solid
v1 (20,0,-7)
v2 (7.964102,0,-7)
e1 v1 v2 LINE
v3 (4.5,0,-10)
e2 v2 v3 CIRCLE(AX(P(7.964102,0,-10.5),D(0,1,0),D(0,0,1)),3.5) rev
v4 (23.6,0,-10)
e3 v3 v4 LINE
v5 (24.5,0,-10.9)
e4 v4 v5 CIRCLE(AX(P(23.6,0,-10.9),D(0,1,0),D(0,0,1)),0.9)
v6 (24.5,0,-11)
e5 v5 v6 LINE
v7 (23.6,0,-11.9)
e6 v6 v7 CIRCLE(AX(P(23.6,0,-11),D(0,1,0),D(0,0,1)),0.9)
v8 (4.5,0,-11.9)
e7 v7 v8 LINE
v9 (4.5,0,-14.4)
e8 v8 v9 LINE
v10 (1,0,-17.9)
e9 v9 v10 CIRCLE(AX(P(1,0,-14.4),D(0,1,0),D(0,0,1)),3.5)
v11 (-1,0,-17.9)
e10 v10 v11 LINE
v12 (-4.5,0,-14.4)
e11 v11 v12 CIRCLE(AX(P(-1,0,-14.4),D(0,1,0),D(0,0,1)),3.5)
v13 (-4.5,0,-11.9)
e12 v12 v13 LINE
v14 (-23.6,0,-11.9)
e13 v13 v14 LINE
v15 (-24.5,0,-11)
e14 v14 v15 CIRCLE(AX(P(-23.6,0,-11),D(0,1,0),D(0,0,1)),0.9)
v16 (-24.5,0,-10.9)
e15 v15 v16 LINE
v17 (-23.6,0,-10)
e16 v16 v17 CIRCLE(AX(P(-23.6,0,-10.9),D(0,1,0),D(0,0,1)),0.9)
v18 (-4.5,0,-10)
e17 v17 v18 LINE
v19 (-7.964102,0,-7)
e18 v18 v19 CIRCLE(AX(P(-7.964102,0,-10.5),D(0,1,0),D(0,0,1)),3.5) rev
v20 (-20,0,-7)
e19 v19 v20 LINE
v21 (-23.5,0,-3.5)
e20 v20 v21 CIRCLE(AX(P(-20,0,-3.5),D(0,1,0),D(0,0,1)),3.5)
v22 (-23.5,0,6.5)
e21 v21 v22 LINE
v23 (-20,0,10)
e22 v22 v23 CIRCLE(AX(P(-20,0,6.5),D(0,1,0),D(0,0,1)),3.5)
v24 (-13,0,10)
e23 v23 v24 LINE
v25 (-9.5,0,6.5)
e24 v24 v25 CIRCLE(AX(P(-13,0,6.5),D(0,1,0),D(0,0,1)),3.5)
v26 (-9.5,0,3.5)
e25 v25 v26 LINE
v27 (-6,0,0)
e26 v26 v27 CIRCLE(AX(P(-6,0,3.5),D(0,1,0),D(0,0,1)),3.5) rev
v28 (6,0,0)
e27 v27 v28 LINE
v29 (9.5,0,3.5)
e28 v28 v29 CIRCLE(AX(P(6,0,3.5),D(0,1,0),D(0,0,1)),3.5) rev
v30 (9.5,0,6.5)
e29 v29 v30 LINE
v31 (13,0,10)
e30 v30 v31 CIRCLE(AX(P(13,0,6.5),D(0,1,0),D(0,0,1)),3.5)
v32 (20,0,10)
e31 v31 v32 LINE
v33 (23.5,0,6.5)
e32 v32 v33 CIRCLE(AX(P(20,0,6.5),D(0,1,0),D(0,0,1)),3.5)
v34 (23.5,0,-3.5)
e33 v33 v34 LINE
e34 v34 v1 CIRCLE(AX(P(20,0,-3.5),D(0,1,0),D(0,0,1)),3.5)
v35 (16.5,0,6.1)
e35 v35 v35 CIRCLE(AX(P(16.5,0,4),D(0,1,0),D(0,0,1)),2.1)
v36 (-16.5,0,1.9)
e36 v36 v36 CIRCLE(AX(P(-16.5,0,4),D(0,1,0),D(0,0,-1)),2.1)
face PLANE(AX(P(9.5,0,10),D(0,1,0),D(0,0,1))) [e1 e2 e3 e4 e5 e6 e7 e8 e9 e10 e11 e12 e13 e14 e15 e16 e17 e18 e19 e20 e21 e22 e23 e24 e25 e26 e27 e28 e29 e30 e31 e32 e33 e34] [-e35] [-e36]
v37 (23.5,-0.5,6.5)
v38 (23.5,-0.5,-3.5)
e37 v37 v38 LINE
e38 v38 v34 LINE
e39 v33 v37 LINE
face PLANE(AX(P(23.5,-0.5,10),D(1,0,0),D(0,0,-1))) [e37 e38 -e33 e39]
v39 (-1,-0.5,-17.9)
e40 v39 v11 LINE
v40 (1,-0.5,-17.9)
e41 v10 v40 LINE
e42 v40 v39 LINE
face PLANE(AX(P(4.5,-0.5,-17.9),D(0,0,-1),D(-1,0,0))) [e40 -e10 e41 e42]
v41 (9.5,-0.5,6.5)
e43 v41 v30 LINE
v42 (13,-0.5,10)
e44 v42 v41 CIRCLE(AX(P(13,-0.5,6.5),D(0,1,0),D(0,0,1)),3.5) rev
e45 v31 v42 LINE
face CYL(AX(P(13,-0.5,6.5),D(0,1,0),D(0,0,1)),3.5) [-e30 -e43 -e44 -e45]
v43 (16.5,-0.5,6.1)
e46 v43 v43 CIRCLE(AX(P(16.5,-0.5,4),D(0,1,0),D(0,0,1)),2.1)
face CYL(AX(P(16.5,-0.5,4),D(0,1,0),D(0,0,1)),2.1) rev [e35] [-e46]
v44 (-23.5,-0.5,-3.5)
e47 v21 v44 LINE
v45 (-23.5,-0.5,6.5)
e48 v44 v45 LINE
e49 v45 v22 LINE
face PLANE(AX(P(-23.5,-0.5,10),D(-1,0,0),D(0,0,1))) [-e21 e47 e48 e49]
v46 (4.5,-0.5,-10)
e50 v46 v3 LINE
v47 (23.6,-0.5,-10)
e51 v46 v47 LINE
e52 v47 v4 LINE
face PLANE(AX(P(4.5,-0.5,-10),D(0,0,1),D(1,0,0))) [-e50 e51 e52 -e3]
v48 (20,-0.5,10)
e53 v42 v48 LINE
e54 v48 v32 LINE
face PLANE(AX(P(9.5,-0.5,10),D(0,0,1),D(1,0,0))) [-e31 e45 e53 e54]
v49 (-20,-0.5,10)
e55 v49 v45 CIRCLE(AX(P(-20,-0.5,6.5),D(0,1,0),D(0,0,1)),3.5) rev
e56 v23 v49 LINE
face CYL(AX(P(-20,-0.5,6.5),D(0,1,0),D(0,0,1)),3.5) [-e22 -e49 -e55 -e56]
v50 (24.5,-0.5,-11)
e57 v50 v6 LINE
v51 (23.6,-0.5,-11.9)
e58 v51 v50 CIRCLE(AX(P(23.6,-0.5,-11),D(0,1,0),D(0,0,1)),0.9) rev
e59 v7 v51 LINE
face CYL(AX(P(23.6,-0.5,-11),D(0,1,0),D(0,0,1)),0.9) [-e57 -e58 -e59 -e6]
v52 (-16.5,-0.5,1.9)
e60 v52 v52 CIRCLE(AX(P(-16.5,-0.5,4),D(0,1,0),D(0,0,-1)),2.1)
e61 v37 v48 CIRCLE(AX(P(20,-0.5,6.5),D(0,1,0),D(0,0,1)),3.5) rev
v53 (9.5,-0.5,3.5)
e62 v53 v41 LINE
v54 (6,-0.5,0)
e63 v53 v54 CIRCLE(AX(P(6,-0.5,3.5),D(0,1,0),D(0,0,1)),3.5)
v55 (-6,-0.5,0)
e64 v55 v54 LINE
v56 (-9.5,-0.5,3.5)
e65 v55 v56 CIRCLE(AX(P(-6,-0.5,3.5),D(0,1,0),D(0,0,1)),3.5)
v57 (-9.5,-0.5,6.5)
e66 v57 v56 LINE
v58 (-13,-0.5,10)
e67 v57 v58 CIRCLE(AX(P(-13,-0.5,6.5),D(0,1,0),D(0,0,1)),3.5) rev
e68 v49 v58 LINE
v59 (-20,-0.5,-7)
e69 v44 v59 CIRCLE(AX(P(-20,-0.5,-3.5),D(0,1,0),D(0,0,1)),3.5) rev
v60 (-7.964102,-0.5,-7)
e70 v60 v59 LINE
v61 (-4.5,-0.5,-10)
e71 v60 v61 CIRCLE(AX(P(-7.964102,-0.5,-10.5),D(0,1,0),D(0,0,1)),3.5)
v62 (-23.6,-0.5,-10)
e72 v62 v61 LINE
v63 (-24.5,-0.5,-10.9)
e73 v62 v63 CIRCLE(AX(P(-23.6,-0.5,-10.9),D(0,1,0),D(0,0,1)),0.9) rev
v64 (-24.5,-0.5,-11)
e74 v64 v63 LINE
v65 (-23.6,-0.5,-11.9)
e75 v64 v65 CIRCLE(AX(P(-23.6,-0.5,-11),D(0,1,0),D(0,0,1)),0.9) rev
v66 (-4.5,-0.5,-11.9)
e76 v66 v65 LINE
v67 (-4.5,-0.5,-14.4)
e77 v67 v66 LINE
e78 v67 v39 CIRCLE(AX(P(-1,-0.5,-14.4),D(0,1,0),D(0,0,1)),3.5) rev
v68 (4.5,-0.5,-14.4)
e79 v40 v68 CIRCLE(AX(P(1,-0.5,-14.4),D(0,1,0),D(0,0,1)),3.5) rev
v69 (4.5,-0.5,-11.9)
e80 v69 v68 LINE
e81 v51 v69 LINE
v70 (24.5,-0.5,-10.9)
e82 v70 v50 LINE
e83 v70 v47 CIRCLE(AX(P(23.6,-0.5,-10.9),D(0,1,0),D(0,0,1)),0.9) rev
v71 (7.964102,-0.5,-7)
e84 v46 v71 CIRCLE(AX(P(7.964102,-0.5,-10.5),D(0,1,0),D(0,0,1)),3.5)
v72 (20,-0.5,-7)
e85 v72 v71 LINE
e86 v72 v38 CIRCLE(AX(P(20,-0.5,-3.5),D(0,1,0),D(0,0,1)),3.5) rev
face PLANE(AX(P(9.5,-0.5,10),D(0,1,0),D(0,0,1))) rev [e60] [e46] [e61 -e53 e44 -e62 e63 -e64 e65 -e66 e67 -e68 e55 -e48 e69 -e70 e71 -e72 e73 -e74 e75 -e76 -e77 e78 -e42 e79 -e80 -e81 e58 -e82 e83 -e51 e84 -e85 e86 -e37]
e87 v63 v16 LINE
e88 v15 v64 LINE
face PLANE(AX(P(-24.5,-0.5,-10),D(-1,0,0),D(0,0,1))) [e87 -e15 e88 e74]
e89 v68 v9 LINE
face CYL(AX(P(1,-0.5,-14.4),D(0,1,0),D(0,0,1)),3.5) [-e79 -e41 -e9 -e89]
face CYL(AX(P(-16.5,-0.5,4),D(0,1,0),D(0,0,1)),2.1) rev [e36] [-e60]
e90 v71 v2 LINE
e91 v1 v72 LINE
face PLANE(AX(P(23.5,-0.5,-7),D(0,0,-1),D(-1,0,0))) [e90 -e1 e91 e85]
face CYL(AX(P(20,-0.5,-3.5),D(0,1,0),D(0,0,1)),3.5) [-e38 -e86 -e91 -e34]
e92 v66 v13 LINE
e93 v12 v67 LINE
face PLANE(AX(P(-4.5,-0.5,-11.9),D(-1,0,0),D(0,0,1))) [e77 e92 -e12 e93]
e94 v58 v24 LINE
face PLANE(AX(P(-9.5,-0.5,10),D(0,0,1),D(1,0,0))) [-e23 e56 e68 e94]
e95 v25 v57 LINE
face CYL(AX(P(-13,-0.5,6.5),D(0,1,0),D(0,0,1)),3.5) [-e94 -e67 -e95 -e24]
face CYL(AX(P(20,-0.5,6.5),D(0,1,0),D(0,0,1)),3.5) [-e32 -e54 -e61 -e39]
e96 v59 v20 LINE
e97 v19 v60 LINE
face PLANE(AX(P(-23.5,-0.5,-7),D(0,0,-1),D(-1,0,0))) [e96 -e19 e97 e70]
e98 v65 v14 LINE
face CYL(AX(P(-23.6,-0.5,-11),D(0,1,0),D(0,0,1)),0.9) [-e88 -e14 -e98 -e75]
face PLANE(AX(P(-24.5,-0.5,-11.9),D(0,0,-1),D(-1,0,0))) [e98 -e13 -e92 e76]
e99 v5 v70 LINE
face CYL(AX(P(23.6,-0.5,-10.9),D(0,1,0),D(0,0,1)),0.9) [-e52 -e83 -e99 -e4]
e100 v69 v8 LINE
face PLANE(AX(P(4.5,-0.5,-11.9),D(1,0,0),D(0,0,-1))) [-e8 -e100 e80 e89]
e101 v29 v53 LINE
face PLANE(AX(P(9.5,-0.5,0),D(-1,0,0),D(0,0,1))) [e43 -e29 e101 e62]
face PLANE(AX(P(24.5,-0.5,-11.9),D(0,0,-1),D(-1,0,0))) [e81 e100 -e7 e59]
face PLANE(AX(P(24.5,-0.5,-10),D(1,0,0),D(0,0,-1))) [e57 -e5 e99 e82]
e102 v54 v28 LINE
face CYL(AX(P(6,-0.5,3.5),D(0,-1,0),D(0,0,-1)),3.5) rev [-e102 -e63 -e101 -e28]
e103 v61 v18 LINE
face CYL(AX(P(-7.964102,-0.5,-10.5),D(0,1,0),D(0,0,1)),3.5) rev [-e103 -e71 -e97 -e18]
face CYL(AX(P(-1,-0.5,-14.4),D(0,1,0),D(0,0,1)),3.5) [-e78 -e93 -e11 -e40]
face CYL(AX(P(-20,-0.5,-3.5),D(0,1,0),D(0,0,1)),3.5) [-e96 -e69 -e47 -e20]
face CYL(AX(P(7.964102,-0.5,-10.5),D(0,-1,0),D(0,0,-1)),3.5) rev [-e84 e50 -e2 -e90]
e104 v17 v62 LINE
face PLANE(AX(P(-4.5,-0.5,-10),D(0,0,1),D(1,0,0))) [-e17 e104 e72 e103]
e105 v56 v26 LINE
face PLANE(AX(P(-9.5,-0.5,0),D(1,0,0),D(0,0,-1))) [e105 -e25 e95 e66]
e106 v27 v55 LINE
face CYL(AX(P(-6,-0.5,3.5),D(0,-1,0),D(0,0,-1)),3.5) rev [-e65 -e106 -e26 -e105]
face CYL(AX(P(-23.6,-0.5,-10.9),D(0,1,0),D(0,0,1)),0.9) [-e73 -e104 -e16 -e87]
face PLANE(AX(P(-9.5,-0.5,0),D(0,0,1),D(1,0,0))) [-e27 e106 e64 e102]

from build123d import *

# Parameters (mm, degrees)
SKETCH2_R          = 2.1
BASE_FLANGE1_DEPTH = 0.5
FILLET1_R          = 3.5
FILLET2_R          = 0.9


# Sheet-metal steps are written as plain solids
with BuildPart() as part:
    # Base-Flange1: sheet metal written as solids
    # Sketch2 → Base-Flange1 (new body)
    with BuildSketch(Plane(origin=(0, 0, 0), x_dir=(1, 0, 0), z_dir=(0, 1, 0))):
        Polygon((-9.5, 0), (9.5, 0), (9.5, -10), (23.5, -10), (23.5, 7), (4.5, 7), (4.5, 10), (24.5, 10), (24.5, 11.9), (4.5, 11.9), (4.5, 17.9), (-4.5, 17.9), (-4.5, 11.9), (-24.5, 11.9), (-24.5, 10), (-4.5, 10), (-4.5, 7), (-23.5, 7), (-23.5, -10), (-9.5, -10), align=None)
        with Locations(Location((16.5, -4, 0), (0, 0, 270))):
            Circle(SKETCH2_R, mode=Mode.SUBTRACT)
        with Locations(Location((-16.5, -4, 0), (0, 0, 90))):
            Circle(SKETCH2_R, mode=Mode.SUBTRACT)
    extrude(amount=-BASE_FLANGE1_DEPTH)

    # Fillet1
    # the kernel refuses this fillet: 3.5 mm, written as the material it adds along each edge
    with BuildSketch(Plane(origin=(9.5, 0, 0), x_dir=(-1, 0, 0), z_dir=(0, -1, 0))) as fillet1_piece_1:
        with BuildLine():
            CenterArc((FILLET1_R, -FILLET1_R), FILLET1_R, 90, 90)
            Line((0, -FILLET1_R), (0, 0))
            Line((0, 0), (FILLET1_R, 0))
        make_face()
    extrude(amount=0.5)
    with BuildSketch(Plane(origin=(-9.5, 0, 0), x_dir=(1, 0, 0), z_dir=(0, -1, 0))) as fillet1_piece_2:
        with BuildLine():
            CenterArc((FILLET1_R, FILLET1_R), FILLET1_R, 180, 90)
            Line((0, FILLET1_R), (0, 0))
            Line((0, 0), (FILLET1_R, 0))
        make_face()
    extrude(amount=0.5)
    with BuildSketch(Plane(origin=(-4.5, 0, -7), x_dir=(0, 0, -1), z_dir=(0, -1, 0))) as fillet1_piece_3:
        with BuildLine():
            CenterArc((3.5, -3.464101615), FILLET1_R, 98.213210702, 81.786789298)
            Line((0, -3.464101615), (0, 0))
            Line((0, 0), (3, 0))
        make_face()
    extrude(amount=0.5)
    with BuildSketch(Plane(origin=(4.5, 0, -7), x_dir=(1, 0, 0), z_dir=(0, -1, 0))) as fillet1_piece_4:
        with BuildLine():
            CenterArc((3.464101615, -3.5), FILLET1_R, 90, 81.786789298)
            Line((0, -3), (0, 0))
            Line((0, 0), (3.464101615, 0))
        make_face()
    extrude(amount=0.5)
    # the kernel refuses this fillet: 3.5 mm, written as the material it takes off along each edge
    with BuildSketch(Plane(origin=(-9.5, 8.75, 10), x_dir=(-1, 0, 0), z_dir=(0, -1, 0)), Plane(origin=(-23.5, 8.75, 10), x_dir=(0, 0, -1), z_dir=(0, -1, 0)), Plane(origin=(-23.5, 8.75, -7), x_dir=(1, 0, 0), z_dir=(0, -1, 0)), Plane(origin=(-4.5, 8.75, -17.9), x_dir=(1, 0, 0), z_dir=(0, -1, 0)), Plane(origin=(4.5, 8.75, -17.9), x_dir=(0, 0, 1), z_dir=(0, -1, 0)), Plane(origin=(23.5, 8.75, -7), x_dir=(0, 0, 1), z_dir=(0, -1, 0)), Plane(origin=(23.5, 8.75, 10), x_dir=(-1, 0, 0), z_dir=(0, -1, 0)), Plane(origin=(9.5, 8.75, 10), x_dir=(0, 0, -1), z_dir=(0, -1, 0))) as fillet1_2_piece_1:
        with BuildLine():
            CenterArc((FILLET1_R, FILLET1_R), FILLET1_R, 180, 90)
            Line((0, FILLET1_R), (0, 0))
            Line((0, 0), (FILLET1_R, 0))
        make_face()
    extrude(amount=18, mode=Mode.SUBTRACT)

    # Fillet2
    fillet2_edges = [part.edges().sort_by_distance(p)[0] for p in [
        (-24.5, -0.25, -10),
        (-24.5, -0.25, -11.9),
        (24.5, -0.25, -11.9),
        (24.5, -0.25, -10),
    ]]
    fillet(fillet2_edges, radius=FILLET2_R)


solid = part.part
